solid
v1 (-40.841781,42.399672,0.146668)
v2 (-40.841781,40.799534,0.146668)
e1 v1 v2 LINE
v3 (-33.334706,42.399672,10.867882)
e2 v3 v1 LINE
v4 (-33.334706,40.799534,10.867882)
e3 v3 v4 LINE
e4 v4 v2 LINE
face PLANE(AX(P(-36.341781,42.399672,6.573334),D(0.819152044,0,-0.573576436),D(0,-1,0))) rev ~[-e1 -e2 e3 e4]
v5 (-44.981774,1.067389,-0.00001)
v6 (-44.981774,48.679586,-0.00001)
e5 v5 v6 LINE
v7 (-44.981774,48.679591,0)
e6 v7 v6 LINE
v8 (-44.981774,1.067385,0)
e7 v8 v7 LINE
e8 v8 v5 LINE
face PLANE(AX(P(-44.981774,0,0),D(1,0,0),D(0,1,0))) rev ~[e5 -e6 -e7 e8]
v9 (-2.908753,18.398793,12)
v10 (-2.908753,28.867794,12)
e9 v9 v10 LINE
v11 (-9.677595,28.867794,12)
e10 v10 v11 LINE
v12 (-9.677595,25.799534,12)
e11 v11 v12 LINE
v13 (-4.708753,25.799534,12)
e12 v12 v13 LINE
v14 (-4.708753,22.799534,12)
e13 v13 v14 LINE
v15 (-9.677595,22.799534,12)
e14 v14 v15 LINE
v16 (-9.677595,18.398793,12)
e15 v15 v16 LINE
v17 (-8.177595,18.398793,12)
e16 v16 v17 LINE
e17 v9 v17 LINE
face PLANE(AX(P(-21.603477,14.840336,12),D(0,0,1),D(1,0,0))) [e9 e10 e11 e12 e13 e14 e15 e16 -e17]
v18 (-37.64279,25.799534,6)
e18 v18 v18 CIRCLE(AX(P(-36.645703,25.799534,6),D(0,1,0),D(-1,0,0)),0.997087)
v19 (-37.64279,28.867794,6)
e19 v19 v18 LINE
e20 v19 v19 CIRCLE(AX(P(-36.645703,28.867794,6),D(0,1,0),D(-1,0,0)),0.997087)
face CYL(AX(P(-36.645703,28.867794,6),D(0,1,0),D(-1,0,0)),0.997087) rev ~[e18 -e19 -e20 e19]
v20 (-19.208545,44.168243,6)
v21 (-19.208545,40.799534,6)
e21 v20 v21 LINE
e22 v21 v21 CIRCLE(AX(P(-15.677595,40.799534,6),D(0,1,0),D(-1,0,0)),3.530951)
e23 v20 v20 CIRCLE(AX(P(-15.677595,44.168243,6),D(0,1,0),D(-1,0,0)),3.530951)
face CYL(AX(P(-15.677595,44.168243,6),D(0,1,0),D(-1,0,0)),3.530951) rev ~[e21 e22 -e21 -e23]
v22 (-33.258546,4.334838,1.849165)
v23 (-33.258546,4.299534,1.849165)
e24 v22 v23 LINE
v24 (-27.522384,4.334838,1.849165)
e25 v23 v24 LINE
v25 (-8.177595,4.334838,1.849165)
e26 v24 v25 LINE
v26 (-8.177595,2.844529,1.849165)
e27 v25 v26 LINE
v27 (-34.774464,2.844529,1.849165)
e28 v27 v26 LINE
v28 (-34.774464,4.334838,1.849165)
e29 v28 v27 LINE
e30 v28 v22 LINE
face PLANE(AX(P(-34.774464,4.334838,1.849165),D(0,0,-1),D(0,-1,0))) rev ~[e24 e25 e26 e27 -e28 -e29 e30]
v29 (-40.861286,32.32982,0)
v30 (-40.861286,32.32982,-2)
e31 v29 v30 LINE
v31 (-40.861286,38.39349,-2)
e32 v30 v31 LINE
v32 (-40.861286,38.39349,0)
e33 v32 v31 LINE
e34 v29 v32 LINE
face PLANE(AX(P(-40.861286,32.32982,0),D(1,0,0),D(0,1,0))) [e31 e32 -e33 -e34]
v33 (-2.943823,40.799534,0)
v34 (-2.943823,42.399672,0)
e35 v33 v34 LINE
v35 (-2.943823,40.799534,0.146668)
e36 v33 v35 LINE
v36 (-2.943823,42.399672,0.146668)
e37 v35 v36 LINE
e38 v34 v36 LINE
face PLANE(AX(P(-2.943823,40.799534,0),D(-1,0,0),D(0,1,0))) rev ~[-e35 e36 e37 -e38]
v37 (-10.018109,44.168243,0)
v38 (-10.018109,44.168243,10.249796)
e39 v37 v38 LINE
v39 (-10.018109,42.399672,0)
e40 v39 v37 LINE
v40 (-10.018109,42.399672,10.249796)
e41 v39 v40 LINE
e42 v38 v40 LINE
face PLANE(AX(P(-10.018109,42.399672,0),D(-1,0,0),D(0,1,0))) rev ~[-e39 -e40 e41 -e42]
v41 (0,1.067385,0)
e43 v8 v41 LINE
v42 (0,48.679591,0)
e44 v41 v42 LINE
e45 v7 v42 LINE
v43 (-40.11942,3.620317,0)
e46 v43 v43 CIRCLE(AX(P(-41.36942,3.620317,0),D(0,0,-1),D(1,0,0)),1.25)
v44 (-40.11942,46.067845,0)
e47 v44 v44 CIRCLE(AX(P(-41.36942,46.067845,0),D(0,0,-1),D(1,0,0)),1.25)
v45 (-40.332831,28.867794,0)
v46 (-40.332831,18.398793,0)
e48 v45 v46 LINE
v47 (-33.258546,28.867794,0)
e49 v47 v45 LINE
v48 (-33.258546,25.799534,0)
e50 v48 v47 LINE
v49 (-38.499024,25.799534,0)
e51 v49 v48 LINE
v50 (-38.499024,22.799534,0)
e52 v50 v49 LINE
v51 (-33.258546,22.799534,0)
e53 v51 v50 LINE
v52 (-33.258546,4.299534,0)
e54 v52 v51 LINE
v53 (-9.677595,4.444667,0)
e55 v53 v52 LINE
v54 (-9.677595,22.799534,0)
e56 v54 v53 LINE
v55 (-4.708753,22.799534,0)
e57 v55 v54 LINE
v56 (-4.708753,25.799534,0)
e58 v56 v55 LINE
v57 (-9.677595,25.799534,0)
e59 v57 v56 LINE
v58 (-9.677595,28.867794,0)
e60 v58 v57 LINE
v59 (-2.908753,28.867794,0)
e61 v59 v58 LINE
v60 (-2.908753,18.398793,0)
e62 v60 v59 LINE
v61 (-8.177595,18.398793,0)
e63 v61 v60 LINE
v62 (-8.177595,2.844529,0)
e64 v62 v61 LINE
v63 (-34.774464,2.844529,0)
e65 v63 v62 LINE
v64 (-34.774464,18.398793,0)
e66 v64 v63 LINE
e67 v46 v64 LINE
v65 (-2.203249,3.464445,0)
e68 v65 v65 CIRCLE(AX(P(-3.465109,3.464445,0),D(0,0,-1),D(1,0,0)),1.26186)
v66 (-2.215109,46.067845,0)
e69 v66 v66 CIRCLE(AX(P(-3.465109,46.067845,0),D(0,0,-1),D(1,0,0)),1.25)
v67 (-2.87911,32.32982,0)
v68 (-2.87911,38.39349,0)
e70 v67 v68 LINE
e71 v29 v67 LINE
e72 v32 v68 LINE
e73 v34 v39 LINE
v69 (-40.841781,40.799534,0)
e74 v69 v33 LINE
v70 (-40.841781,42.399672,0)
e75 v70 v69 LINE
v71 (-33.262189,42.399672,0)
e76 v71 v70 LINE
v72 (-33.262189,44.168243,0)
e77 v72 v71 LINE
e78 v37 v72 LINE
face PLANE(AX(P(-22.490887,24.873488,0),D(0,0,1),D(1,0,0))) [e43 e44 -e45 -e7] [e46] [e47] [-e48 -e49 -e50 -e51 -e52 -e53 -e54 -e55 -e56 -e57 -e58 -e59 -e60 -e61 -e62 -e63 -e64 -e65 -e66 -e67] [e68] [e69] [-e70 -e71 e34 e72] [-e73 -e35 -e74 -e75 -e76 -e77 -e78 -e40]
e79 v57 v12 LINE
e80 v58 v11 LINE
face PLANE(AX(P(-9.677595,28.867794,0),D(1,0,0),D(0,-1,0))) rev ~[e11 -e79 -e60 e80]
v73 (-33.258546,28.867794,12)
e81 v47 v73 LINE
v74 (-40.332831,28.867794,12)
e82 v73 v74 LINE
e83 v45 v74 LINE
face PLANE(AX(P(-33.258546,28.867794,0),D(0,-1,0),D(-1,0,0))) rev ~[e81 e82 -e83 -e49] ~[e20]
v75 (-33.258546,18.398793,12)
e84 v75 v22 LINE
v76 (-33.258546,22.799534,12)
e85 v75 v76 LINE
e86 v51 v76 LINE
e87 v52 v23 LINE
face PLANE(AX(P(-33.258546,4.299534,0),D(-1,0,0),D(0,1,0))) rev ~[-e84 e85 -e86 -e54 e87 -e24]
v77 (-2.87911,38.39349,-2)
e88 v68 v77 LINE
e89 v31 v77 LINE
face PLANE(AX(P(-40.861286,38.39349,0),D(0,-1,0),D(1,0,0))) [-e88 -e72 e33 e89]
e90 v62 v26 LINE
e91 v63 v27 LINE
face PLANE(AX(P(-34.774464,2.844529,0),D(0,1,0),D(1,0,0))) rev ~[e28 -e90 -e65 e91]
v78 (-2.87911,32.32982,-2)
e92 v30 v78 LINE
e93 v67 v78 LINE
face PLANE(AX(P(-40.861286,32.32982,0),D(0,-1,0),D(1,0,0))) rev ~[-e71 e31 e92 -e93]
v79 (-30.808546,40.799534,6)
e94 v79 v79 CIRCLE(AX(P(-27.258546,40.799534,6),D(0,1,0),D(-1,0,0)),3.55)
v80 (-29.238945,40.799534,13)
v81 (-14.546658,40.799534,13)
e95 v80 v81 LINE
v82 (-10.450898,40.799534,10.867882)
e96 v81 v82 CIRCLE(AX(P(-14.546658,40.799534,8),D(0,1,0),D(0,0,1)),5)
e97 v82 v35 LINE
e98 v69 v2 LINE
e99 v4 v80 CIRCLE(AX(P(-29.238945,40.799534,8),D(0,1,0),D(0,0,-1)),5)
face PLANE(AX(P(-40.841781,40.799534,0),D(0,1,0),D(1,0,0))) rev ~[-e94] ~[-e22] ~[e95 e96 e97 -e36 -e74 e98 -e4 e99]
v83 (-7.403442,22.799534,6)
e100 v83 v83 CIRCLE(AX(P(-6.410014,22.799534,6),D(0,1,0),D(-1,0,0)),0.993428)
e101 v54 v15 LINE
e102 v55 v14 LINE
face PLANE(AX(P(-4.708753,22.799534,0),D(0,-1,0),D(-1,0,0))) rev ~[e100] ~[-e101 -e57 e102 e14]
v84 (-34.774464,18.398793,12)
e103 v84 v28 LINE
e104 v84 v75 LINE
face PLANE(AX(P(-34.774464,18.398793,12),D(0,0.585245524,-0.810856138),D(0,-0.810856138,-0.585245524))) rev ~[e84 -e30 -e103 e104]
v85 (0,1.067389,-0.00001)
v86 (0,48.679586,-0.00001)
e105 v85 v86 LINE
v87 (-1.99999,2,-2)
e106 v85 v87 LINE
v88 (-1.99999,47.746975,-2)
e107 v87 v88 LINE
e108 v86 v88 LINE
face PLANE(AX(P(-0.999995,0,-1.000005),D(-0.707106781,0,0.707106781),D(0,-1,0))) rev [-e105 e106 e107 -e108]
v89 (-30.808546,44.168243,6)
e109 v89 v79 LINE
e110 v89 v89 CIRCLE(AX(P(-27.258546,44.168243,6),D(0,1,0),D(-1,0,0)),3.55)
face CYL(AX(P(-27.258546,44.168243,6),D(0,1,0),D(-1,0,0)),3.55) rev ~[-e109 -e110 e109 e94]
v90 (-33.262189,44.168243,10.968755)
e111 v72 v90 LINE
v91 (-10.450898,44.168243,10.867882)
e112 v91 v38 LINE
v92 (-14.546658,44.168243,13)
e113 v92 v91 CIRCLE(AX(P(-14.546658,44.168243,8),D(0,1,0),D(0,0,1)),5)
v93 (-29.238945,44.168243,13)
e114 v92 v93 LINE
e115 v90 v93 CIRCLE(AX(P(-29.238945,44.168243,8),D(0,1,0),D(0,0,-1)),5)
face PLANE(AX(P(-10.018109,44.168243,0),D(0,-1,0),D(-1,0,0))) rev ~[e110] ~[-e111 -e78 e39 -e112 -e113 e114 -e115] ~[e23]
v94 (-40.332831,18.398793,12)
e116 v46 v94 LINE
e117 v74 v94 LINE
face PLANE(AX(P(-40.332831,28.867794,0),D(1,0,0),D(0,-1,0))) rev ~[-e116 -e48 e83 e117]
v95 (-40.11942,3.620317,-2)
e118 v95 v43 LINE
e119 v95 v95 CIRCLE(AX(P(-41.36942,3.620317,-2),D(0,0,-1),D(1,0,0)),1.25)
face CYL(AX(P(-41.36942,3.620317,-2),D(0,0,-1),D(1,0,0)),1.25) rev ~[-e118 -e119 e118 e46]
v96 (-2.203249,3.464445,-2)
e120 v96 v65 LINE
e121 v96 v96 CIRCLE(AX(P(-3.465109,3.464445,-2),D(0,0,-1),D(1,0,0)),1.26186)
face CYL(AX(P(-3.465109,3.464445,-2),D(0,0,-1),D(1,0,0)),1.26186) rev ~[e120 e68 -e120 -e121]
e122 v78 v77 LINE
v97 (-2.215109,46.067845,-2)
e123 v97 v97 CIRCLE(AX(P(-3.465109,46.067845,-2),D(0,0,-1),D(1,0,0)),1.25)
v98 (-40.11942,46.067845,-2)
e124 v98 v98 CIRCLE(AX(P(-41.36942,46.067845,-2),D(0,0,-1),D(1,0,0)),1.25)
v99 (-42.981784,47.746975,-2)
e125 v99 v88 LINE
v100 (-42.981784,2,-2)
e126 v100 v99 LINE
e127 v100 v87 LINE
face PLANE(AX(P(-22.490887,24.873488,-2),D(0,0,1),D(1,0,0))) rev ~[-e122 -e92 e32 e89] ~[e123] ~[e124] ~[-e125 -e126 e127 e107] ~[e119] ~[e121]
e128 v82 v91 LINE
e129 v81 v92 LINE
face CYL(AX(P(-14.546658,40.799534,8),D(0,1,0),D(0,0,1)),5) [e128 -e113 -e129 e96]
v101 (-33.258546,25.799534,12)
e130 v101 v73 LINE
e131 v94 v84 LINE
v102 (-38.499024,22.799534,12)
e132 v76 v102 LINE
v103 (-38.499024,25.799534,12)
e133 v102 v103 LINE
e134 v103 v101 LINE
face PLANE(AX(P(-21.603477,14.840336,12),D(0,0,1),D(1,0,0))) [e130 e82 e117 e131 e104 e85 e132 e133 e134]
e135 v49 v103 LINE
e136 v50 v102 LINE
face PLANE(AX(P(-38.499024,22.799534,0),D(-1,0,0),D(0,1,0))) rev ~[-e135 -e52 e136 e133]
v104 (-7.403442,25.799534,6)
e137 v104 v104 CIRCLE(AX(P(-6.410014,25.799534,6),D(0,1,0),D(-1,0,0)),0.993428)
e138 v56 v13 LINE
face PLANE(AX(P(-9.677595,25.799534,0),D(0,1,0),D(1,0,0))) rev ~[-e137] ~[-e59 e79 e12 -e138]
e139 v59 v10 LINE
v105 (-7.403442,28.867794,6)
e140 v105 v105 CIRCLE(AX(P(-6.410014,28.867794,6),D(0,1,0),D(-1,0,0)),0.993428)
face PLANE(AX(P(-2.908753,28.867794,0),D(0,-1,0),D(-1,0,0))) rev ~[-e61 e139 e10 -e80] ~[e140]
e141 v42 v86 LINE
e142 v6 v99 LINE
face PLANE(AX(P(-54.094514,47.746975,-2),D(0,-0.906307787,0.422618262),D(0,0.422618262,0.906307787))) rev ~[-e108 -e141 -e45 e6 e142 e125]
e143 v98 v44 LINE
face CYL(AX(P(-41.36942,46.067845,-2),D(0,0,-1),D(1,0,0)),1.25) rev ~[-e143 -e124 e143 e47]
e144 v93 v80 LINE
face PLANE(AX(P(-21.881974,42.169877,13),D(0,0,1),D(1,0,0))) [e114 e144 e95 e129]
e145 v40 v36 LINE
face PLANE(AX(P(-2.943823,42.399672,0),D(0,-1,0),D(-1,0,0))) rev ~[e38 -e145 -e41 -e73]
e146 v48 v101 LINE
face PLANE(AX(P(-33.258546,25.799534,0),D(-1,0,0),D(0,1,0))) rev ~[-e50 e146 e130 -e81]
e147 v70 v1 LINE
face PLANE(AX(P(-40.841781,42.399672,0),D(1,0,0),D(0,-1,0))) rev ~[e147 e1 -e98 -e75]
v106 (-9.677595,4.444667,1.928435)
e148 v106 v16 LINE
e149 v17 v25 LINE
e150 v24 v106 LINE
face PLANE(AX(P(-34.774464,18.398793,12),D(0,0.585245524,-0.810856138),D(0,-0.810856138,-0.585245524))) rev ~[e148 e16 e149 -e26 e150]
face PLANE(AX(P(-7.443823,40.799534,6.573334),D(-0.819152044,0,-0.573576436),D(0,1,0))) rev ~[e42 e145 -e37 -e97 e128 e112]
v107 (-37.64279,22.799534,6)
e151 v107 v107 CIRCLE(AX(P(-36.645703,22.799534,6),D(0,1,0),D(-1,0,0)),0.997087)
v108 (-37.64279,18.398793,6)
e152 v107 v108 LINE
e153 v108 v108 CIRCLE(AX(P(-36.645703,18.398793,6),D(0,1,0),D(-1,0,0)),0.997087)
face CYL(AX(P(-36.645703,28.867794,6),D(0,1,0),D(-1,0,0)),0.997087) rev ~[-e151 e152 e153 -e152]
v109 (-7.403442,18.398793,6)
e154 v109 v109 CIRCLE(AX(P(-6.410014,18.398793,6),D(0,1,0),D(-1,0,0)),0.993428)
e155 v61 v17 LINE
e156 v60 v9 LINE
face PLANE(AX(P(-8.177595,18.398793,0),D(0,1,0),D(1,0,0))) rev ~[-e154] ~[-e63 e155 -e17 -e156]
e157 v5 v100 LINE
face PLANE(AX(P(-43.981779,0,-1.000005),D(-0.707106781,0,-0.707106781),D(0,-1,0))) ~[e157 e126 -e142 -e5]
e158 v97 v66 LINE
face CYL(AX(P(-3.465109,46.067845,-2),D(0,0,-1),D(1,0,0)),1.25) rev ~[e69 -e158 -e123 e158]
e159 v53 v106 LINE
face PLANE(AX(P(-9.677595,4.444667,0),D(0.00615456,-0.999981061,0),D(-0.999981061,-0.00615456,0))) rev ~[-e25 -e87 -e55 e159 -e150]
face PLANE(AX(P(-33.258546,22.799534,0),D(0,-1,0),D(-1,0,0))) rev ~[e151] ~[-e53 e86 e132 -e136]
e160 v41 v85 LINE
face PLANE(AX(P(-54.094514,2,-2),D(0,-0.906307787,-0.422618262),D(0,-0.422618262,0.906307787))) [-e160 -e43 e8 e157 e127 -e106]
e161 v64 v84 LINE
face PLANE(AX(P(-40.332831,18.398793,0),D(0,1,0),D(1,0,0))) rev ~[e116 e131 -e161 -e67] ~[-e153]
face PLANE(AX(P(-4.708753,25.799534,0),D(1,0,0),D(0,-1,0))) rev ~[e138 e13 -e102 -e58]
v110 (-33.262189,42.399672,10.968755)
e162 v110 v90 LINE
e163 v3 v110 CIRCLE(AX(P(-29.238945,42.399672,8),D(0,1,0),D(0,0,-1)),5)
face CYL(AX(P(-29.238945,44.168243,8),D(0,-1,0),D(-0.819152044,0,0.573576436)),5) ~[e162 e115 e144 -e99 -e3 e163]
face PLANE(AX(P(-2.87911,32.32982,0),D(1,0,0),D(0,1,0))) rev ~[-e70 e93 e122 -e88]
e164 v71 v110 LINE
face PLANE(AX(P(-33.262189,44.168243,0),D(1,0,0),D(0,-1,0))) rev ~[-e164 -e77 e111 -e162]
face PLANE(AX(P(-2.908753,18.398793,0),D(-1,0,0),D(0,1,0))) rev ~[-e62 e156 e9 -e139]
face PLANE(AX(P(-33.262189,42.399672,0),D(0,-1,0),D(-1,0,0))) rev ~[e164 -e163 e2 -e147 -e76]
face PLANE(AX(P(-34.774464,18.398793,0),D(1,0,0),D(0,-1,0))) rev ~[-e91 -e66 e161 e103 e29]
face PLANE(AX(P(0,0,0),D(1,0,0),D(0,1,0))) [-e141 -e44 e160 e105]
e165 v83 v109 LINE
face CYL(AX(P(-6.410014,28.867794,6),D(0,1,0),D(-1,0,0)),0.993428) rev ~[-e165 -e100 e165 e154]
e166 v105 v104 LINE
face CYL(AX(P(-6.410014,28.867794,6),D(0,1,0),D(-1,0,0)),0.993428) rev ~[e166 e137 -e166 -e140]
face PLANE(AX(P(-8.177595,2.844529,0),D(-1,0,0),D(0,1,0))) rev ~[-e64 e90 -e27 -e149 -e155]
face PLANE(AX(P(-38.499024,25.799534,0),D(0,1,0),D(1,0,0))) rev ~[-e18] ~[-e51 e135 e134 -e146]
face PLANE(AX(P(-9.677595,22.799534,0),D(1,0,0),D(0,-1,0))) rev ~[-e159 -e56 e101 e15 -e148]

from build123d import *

# Parameters (mm, degrees)
F0_W         = 44.9817739427
F0_H         = 49.7469753027
F3_DEPTH     = 2
F4_DEPTH     = 12
F2_W         = 37.9821762908
F2_H         = 6.06366992
F5_DEPTH     = 6.6
F6_DEPTH     = 13
F7_R         = 3.5309507028
F7_R_2       = 3.55
F8_DEPTH     = 5
F9_SIZE2     = 12.8533320607
F9_SIZE      = 9
F10_R        = 5
F11_R        = 0.9934278603
F12_DEPTH    = 11
F13_R        = 0.9970874125
F14_DEPTH    = 11
F15_R        = 1.25
F15_R_2      = 1.261860196
F16_DEPTH    = 4
F18_DEPTH    = 29.1
F19_SIZE     = 1.99999
F20_T1_DEPTH = 63.2072532601


# Not quite as in the source:
# - a fillet or chamfer that OpenCascade refuses, or shapes differently, is made with other operations: its cross-section is extruded or revolved along the edge and cut away or added
# - a fillet or chamfer is up to 0.001 mm smaller than in the source, because OpenCascade refuses the exact size


with BuildPart() as f3:
    # F0 (on Top) → F3 (new body)
    with BuildSketch(Plane.XY):
        with Locations((-22.4908869714, 24.8734876513)):
            Rectangle(F0_W, F0_H)
    extrude(amount=-F3_DEPTH)

    # F1 (on face) → F4 (join)
    with BuildSketch(Plane.XY):
        Polygon((-9.6775945276, 22.7995335534), (-9.6775945276, 4.4446666725), (-33.2585461438, 4.2995335534), (-33.2585461438, 22.7995335534), (-38.4990237653, 22.7995335534), (-38.4990237653, 25.7995335534), (-33.2585461438, 25.7995335534), (-33.2585461438, 28.8677942008), (-40.3328314424, 28.8677942008), (-40.3328314424, 18.3987934142), (-34.7744636238, 18.3987934142), (-34.7744636238, 2.8445292264), (-8.1775945276, 2.8445292264), (-8.1775945276, 18.3987934142), (-2.9087525018, 18.3987934142), (-2.9087525018, 28.8677942008), (-9.6775945276, 28.8677942008), (-9.6775945276, 25.7995335534), (-4.7087525018, 25.7995335534), (-4.7087525018, 22.7995335534), align=None)
    extrude(amount=F4_DEPTH)

    # F2 (on Top) → F5 (cut)
    with BuildSketch(Plane.XY):
        with Locations((-21.8701980775, 35.3616550565)):
            Rectangle(F2_W, F2_H)
    extrude(amount=-F5_DEPTH, mode=Mode.SUBTRACT)

    # F1 (on face) → F6 (join)
    with BuildSketch(Plane.XY):
        Polygon((-40.8417806029, 42.3996723965), (-40.8417806029, 40.7995335534), (-2.9438226484, 40.7995335534), (-2.9438226484, 42.3996723965), (-10.0181093439, 42.3996723965), (-10.0181093439, 44.1682427898), (-33.2621894777, 44.1682427898), (-33.2621894777, 42.3996723965), align=None)
    extrude(amount=F6_DEPTH)

    # F7 (on face) → F8 (cut)
    with BuildSketch(Plane(origin=(0, 44.1682427898, 0), x_dir=(-1, 0, 0), z_dir=(0, 1, 0))):
        with Locations((15.6775945276, 6)):
            Circle(F7_R)
        with Locations((27.2585461438, 6)):
            Circle(F7_R_2)
    extrude(amount=-F8_DEPTH, mode=Mode.SUBTRACT)

    # F9
    f9_edges = [f3.edges().sort_by_distance(p)[0] for p in [
        (-40.841781, 41.599603, 13),
        (-2.943823, 41.599603, 13),
    ]]
    f9_side = f3.faces().sort_by_distance((-21.790726, 42.280107, 13))[0]
    chamfer(f9_edges, length=F9_SIZE, length2=F9_SIZE2, reference=f9_side)

    # F10
    f10_edges = [f3.edges().sort_by_distance(p)[0] for p in [
        (-11.943823, 42.483888, 13),
        (-31.841781, 42.483888, 13),
    ]]
    fillet(f10_edges, radius=F10_R)

    # F11 (on face) → F12 (cut)
    with BuildSketch(Plane(origin=(0, 28.8677942008, 0), x_dir=(-1, 0, 0), z_dir=(0, 1, 0))):
        with Locations((6.41001435, 6)):
            Circle(F11_R)
    extrude(amount=-F12_DEPTH, mode=Mode.SUBTRACT)

    # F13 (on face) → F14 (cut)
    with BuildSketch(Plane(origin=(0, 28.8677942008, 0), x_dir=(-1, 0, 0), z_dir=(0, 1, 0))):
        with Locations((36.6457030177, 6)):
            Circle(F13_R)
    extrude(amount=-F14_DEPTH, mode=Mode.SUBTRACT)

    # F15 (on face) → F16 (cut)
    with BuildSketch(Plane(origin=(0, 0, -2), x_dir=(1, 0, 0), z_dir=(0, 0, -1))):
        with Locations((-41.3694195449, -3.6203172058)):
            Circle(F15_R)
        with Locations((-3.4651088063, -3.4644450061)):
            Circle(F15_R_2)
        with Locations((-41.3694195449, -46.0678450763)):
            Circle(F15_R)
        with Locations((-3.4651088063, -46.0678450763)):
            Circle(F15_R)
    extrude(amount=-F16_DEPTH, mode=Mode.SUBTRACT)

    # F17 (on face) → F18 (cut)
    with BuildSketch(Plane(origin=(-34.7744636238, 0, 0), x_dir=(0, -1, 0), z_dir=(-1, 0, 0))):
        Polygon((-2.8445292264, 12), (-18.3987934142, 12), (-4.3348377745, 1.8491647206), (-2.8445292264, 1.8491647206), align=None)
    extrude(amount=-F18_DEPTH, mode=Mode.SUBTRACT)

    # F19 (size 2 in the source; OpenCascade refuses exactly that, so slightly less here)
    f19_edges = [f3.edges().sort_by_distance(p)[0] for p in [
        (-44.981774, 24.873488, -2),
        (0, 24.873488, -2),
    ]]
    chamfer(f19_edges, length=F19_SIZE)

    # F20: chamfer of 2 x 4.289013841 on 2 edges, made by hand

    # F20_s2 → F20_t1 (cut)
    with BuildSketch(Plane.YZ.offset(-54.0945136014)):
        Polygon((2, -2), (0, 2.289013841), (0, -2), align=None)
        Polygon((47.7469753027, -2), (49.7469753027, 2.289013841), (49.7469753027, -2), align=None)
    extrude(amount=F20_T1_DEPTH, mode=Mode.SUBTRACT)


solid = f3.part
